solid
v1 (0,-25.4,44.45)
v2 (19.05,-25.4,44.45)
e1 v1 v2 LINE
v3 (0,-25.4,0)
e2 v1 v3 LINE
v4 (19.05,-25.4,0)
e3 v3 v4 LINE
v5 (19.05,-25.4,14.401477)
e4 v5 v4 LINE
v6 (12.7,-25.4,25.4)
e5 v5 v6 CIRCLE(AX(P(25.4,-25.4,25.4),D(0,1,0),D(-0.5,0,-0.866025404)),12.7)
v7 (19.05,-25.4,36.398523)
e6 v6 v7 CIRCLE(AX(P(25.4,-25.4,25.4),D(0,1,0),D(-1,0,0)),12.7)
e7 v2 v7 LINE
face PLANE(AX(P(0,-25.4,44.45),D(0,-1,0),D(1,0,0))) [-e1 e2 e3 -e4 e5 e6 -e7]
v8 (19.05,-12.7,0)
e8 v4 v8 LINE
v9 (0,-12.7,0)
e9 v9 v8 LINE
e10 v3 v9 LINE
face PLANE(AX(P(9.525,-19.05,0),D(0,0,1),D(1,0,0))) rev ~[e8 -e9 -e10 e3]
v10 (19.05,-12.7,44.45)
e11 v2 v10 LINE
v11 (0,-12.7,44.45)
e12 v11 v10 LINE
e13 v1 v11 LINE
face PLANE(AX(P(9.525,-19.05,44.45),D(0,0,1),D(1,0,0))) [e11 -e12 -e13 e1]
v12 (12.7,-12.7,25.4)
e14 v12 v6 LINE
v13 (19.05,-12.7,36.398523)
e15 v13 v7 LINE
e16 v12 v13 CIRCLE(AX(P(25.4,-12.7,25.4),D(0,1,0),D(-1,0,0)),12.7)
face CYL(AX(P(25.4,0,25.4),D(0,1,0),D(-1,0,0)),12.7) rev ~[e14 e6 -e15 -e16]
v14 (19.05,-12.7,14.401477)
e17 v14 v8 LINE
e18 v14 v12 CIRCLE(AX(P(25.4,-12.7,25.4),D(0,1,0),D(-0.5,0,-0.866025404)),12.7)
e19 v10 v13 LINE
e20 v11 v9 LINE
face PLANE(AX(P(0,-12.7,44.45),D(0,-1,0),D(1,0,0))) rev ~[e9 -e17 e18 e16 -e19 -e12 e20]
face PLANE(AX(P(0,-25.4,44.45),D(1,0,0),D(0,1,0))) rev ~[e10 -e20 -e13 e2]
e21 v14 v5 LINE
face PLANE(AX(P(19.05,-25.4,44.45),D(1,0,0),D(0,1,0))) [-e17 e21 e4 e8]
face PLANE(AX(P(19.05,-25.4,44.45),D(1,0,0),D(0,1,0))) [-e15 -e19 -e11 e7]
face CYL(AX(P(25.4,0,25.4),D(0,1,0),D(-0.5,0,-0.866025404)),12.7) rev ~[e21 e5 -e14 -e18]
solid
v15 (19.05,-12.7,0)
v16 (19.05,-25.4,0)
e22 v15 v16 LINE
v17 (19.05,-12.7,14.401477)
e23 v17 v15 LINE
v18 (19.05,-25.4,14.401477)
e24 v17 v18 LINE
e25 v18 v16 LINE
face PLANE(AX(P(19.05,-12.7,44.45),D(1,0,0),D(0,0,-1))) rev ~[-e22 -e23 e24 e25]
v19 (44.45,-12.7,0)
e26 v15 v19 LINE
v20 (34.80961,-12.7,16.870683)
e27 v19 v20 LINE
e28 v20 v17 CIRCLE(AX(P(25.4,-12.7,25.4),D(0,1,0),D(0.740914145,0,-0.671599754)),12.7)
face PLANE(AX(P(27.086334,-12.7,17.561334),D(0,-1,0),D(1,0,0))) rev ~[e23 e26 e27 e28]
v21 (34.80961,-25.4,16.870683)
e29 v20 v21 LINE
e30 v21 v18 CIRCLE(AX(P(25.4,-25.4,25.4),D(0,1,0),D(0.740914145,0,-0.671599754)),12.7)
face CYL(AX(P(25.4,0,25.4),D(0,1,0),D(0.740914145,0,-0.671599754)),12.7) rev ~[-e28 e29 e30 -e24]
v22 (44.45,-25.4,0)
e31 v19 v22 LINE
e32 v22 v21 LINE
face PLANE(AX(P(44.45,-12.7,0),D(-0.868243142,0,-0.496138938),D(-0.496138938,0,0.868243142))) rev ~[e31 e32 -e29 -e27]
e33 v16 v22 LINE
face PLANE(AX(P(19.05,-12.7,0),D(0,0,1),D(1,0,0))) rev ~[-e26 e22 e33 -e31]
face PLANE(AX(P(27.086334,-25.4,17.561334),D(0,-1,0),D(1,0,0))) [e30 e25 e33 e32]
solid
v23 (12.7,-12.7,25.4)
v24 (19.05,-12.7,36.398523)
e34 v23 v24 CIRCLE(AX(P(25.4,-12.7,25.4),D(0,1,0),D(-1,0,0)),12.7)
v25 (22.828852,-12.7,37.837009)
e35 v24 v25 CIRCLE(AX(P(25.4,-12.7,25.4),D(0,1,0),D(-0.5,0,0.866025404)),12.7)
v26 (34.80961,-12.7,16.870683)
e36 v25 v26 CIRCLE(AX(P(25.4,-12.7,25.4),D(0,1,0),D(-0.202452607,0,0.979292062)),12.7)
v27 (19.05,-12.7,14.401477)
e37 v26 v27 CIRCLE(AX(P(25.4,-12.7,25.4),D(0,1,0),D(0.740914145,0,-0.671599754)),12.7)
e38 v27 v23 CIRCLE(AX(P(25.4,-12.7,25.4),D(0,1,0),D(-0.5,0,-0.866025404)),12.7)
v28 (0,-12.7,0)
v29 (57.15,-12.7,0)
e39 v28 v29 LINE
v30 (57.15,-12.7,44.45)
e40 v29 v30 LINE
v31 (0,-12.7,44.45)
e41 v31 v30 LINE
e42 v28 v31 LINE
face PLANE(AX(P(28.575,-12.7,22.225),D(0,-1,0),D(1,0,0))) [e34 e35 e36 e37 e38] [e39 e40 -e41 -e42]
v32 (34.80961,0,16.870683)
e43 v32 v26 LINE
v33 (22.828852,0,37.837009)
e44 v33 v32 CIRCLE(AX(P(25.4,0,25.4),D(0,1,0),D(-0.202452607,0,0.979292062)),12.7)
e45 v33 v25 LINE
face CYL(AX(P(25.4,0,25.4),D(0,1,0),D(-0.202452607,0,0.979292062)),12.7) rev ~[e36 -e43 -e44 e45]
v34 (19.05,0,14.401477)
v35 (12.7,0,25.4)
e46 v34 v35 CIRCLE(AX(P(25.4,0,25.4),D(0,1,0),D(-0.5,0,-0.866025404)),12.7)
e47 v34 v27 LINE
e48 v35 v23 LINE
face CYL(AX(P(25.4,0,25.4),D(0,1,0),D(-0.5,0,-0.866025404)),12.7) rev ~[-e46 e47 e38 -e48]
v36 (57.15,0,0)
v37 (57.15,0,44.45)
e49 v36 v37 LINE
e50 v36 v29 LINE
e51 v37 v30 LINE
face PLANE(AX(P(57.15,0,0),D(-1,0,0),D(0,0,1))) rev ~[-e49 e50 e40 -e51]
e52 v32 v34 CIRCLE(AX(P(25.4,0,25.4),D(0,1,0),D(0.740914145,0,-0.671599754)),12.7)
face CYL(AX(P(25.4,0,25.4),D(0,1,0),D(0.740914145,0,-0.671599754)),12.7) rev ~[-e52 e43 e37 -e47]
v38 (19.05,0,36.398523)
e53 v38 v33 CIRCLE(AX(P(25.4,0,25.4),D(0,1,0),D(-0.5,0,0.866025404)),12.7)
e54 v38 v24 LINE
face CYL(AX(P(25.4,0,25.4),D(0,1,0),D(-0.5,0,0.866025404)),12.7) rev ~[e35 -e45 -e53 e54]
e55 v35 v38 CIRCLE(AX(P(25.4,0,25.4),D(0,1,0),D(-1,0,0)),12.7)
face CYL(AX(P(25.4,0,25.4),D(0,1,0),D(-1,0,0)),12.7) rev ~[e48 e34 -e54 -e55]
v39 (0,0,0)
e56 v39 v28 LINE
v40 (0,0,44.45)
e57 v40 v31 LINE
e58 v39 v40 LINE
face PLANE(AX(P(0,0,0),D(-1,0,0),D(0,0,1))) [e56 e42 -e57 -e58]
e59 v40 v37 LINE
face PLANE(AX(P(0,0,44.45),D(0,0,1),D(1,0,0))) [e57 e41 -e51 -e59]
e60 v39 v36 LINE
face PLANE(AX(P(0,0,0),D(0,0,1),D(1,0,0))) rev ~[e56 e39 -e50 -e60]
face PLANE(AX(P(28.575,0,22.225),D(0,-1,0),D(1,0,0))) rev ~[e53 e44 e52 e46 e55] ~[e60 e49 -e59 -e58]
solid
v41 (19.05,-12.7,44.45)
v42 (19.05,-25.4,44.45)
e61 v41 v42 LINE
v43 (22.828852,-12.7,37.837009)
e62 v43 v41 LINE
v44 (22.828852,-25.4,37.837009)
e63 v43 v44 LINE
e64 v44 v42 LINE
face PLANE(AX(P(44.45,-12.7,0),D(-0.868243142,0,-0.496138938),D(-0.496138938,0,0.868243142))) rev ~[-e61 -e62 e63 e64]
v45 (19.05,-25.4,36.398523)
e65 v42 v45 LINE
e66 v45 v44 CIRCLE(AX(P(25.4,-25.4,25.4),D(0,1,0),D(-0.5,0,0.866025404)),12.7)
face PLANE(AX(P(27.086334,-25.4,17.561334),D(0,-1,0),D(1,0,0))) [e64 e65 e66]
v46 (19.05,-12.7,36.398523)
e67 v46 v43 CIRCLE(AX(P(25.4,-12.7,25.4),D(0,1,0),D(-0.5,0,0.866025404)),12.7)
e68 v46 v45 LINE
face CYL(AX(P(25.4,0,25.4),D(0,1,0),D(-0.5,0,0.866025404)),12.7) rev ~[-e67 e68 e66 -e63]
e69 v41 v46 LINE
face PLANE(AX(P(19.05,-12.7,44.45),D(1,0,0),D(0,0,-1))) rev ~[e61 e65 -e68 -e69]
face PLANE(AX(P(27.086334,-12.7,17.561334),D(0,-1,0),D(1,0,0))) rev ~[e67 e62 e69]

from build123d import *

# Parameters (mm, degrees)
F0_W     = 57.15
F0_H     = 44.45
F1_DEPTH = 12.7
F2_W     = 19.05
F2_H     = 12.7
F3_DEPTH = 44.45
F5_DEPTH = 12.7
F7_DEPTH = 25.4


# Not quite as in the source:
# - a feature of the source that left no trace in its solid (it failed there, or was rolled back) is left out


with BuildPart() as f1:
    # F0 (on Front) → F1 (new body)
    with BuildSketch(Plane.XZ):
        with Locations((28.575, 22.225)):
            Rectangle(F0_W, F0_H)
    extrude(amount=F1_DEPTH)


with BuildPart() as f3:
    # F2 (on face) → F3 (new body)
    with BuildSketch(Plane.XY.offset(44.45)):
        with Locations((9.525, -19.05)):
            Rectangle(F2_W, F2_H)
    extrude(amount=-F3_DEPTH)


with BuildPart() as f5:
    # F4 (on face) → F5 (new body)
    with BuildSketch(Plane.XZ.offset(12.7)):
        Polygon((44.45, 0), (19.05, 44.45), (19.05, 0), align=None)
    extrude(amount=F5_DEPTH)


with BuildPart() as f7_tool:
    # F6 (on face) → F7 (new body)
    with BuildSketch(Plane(origin=(0, 0, 0), x_dir=(-1, 0, 0), z_dir=(0, 1, 0))):
        with BuildLine():
            ThreePointArc((-22.8288518953, 37.8370091832), (-36.426687905, 31.7009645171), (-34.8096096432, 16.8706831245))
            Line((-34.8096096432, 16.8706831245), (-22.8288518953, 37.8370091832))
        make_face()
        with BuildLine():
            Line((-22.8288518953, 37.8370091832), (-34.8096096432, 16.8706831245))
            ThreePointArc((-34.8096096432, 16.8706831245), (-27.3658451247, 12.8530699792), (-19.05, 14.4014773719))
            Line((-19.05, 14.4014773719), (-19.05, 36.3985226281))
            ThreePointArc((-19.05, 36.3985226281), (-20.8818110078, 37.2691182584), (-22.8288518953, 37.8370091832))
        make_face()
        with BuildLine():
            Line((-19.05, 36.3985226281), (-19.05, 14.4014773719))
            ThreePointArc((-19.05, 14.4014773719), (-14.4014773719, 19.05), (-12.7, 25.4))
            ThreePointArc((-12.7, 25.4), (-14.4014773719, 31.75), (-19.05, 36.3985226281))
        make_face()
    extrude(amount=-F7_DEPTH)


with BuildPart() as f1_1:
    add(f1.part)

    # F7: cut by f7_tool
    add(f7_tool.part, mode=Mode.SUBTRACT)


with BuildPart() as f3_1:
    add(f3.part)

    # F7: cut by f7_tool
    add(f7_tool.part, mode=Mode.SUBTRACT)


with BuildPart() as f5_1:
    add(f5.part)

    # F7: cut by f7_tool
    add(f7_tool.part, mode=Mode.SUBTRACT)


solid = Compound([f1_1.part, f3_1.part, f5_1.part])
